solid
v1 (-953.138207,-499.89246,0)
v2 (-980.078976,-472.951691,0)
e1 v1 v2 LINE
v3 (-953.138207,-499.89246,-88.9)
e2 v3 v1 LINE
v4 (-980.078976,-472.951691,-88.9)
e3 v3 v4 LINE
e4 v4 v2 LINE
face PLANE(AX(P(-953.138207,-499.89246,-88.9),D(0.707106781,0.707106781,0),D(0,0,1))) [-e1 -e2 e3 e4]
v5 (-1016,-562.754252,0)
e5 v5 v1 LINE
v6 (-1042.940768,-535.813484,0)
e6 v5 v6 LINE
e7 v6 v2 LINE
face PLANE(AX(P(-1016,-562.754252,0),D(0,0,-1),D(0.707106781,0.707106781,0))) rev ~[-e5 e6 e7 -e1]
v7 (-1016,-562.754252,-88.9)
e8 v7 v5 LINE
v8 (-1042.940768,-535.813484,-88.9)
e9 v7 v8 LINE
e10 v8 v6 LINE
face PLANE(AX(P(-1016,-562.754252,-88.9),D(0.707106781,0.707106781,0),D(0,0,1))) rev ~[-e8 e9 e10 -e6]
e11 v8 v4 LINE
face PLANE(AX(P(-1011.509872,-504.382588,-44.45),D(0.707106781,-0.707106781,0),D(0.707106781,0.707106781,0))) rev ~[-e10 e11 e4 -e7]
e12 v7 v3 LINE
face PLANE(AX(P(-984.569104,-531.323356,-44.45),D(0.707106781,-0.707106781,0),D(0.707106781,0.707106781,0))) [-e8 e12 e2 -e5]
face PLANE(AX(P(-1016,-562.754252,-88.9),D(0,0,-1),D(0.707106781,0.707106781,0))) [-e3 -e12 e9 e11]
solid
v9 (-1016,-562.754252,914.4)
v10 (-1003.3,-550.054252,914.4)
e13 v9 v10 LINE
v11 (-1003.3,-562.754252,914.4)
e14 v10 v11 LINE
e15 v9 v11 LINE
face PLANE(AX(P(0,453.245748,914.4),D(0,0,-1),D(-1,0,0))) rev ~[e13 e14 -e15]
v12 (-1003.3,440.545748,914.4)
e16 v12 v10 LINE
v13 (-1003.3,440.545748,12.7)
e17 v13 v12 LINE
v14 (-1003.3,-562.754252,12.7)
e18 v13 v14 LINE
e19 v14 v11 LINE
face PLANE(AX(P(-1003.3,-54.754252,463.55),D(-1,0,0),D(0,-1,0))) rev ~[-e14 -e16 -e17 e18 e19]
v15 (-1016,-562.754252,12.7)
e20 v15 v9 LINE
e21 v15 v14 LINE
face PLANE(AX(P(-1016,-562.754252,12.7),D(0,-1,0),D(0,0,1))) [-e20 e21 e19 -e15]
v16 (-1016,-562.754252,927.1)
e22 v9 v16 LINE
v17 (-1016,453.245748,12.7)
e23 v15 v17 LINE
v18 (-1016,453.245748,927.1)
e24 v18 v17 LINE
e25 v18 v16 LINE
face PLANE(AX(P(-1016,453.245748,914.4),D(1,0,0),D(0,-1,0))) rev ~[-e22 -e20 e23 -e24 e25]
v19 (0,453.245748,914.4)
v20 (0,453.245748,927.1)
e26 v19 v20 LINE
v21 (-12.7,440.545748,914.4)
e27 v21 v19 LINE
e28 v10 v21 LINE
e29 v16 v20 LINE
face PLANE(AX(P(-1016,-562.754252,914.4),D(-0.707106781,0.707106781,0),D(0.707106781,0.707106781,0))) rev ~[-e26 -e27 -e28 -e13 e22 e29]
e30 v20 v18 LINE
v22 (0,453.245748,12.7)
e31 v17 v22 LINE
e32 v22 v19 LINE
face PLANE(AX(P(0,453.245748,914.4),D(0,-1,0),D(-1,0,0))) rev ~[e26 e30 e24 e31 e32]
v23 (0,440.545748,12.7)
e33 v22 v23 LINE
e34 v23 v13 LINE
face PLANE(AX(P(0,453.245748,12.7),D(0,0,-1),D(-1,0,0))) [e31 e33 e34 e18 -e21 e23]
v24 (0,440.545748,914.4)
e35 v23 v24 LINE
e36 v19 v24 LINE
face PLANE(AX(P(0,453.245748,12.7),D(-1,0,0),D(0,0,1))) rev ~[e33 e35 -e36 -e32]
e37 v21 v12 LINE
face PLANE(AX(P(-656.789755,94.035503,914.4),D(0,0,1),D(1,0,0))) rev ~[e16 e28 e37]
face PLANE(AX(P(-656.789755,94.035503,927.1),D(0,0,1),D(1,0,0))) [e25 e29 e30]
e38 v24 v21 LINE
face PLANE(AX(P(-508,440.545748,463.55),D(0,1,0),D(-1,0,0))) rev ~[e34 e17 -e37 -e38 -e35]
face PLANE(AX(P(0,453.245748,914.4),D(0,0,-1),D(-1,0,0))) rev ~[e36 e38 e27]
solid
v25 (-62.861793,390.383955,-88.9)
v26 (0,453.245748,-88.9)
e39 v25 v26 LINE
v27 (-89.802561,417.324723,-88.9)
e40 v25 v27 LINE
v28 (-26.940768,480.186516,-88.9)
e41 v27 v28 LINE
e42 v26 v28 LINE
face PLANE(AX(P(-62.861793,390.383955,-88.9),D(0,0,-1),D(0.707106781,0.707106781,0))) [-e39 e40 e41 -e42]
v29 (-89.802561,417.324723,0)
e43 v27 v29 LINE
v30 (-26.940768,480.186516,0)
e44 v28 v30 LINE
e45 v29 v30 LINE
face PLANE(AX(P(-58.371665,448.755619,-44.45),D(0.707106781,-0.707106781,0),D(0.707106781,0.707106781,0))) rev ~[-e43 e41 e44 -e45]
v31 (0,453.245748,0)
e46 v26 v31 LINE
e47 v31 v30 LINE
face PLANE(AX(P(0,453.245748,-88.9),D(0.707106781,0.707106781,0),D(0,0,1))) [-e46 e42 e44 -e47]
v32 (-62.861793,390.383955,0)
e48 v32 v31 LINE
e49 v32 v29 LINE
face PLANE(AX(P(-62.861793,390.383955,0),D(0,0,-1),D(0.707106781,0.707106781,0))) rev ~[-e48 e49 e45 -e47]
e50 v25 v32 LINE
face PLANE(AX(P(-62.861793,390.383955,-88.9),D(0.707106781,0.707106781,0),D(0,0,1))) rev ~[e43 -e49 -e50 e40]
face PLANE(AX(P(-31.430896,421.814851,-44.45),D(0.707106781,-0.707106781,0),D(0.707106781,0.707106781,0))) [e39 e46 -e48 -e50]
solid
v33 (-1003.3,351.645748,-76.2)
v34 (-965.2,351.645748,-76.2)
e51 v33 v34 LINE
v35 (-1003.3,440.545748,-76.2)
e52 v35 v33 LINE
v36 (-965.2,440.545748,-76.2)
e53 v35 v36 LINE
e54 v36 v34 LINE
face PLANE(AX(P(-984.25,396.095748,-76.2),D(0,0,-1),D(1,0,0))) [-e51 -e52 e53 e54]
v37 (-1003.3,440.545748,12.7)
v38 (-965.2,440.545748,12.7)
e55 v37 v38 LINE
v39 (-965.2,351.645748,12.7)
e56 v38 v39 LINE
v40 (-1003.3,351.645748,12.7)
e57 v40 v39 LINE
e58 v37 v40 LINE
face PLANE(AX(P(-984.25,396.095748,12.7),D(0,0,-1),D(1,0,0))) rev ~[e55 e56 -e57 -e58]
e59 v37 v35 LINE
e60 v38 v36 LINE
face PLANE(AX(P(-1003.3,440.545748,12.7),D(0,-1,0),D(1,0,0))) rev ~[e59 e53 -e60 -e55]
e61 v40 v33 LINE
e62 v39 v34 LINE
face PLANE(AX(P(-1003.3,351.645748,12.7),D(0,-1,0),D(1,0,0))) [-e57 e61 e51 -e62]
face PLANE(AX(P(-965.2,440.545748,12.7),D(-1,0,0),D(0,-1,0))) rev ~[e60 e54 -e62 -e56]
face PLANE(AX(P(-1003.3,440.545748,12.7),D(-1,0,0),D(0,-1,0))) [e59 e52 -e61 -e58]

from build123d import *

# Parameters (mm, degrees)
F2_W      = 1016
F2_H      = 901.7
F3_DEPTH  = 12.7
F4_W      = 1016
F4_H      = 901.7
F5_DEPTH  = 12.7
F6_W      = 88.9
F6_H      = 88.9
F7_DEPTH  = 38.1
F8_W      = 38.1
F8_H      = 88.9
F9_DEPTH  = 88.9
F11_DEPTH = 12.7


with BuildPart() as f3:
    # F2 (on face) → F3 (new body)
    with BuildSketch(Plane(origin=(0, 453.2457475339, 0), x_dir=(-1, 0, 0), z_dir=(0, 1, 0))):
        with Locations((508, 463.55)):
            Rectangle(F2_W, F2_H)
    extrude(amount=-F3_DEPTH)

    # F4 (on face) → F5 (join)
    with BuildSketch(Plane(origin=(-1016, 0, 0), x_dir=(0, -1, 0), z_dir=(-1, 0, 0))):
        with Locations((54.7542524661, 463.55)):
            Rectangle(F4_W, F4_H)
    extrude(amount=-F5_DEPTH)

    # F10 (on face) → F11 (join)
    with BuildSketch(Plane.XY.offset(914.4)):
        Polygon((-1016, 453.2457475339), (-1016, -562.7542524661), (0, 453.2457475339), align=None)
    extrude(amount=F11_DEPTH)


with BuildPart() as f7:
    # F6 (on face) → F7 (new body)
    with BuildSketch(Plane(origin=(-226.6228737669, 226.6228737669, 0), x_dir=(0.7071067812, 0.7071067812, 0), z_dir=(0.7071067812, -0.7071067812, 0))):
        with Locations((-1071.8978377459, -44.45)):
            Rectangle(F6_W, F6_H)
    extrude(amount=-F7_DEPTH)


with BuildPart() as f7b:
    # F6 (on face) → F7, piece 2 (new body)
    with BuildSketch(Plane(origin=(-226.6228737669, 226.6228737669, 0), x_dir=(0.7071067812, 0.7071067812, 0), z_dir=(0.7071067812, -0.7071067812, 0))):
        with Locations((276.0431416252, -44.45)):
            Rectangle(F6_W, F6_H)
    extrude(amount=-F7_DEPTH)


with BuildPart() as f9:
    # F8 (on face) → F9 (new body)
    with BuildSketch(Plane(origin=(0, 0, 12.7), x_dir=(1, 0, 0), z_dir=(0, 0, -1))):
        with Locations((-984.25, -396.0957475339)):
            Rectangle(F8_W, F8_H)
    extrude(amount=F9_DEPTH)


solid = Compound([f3.part, f7.part, f7b.part, f9.part])
